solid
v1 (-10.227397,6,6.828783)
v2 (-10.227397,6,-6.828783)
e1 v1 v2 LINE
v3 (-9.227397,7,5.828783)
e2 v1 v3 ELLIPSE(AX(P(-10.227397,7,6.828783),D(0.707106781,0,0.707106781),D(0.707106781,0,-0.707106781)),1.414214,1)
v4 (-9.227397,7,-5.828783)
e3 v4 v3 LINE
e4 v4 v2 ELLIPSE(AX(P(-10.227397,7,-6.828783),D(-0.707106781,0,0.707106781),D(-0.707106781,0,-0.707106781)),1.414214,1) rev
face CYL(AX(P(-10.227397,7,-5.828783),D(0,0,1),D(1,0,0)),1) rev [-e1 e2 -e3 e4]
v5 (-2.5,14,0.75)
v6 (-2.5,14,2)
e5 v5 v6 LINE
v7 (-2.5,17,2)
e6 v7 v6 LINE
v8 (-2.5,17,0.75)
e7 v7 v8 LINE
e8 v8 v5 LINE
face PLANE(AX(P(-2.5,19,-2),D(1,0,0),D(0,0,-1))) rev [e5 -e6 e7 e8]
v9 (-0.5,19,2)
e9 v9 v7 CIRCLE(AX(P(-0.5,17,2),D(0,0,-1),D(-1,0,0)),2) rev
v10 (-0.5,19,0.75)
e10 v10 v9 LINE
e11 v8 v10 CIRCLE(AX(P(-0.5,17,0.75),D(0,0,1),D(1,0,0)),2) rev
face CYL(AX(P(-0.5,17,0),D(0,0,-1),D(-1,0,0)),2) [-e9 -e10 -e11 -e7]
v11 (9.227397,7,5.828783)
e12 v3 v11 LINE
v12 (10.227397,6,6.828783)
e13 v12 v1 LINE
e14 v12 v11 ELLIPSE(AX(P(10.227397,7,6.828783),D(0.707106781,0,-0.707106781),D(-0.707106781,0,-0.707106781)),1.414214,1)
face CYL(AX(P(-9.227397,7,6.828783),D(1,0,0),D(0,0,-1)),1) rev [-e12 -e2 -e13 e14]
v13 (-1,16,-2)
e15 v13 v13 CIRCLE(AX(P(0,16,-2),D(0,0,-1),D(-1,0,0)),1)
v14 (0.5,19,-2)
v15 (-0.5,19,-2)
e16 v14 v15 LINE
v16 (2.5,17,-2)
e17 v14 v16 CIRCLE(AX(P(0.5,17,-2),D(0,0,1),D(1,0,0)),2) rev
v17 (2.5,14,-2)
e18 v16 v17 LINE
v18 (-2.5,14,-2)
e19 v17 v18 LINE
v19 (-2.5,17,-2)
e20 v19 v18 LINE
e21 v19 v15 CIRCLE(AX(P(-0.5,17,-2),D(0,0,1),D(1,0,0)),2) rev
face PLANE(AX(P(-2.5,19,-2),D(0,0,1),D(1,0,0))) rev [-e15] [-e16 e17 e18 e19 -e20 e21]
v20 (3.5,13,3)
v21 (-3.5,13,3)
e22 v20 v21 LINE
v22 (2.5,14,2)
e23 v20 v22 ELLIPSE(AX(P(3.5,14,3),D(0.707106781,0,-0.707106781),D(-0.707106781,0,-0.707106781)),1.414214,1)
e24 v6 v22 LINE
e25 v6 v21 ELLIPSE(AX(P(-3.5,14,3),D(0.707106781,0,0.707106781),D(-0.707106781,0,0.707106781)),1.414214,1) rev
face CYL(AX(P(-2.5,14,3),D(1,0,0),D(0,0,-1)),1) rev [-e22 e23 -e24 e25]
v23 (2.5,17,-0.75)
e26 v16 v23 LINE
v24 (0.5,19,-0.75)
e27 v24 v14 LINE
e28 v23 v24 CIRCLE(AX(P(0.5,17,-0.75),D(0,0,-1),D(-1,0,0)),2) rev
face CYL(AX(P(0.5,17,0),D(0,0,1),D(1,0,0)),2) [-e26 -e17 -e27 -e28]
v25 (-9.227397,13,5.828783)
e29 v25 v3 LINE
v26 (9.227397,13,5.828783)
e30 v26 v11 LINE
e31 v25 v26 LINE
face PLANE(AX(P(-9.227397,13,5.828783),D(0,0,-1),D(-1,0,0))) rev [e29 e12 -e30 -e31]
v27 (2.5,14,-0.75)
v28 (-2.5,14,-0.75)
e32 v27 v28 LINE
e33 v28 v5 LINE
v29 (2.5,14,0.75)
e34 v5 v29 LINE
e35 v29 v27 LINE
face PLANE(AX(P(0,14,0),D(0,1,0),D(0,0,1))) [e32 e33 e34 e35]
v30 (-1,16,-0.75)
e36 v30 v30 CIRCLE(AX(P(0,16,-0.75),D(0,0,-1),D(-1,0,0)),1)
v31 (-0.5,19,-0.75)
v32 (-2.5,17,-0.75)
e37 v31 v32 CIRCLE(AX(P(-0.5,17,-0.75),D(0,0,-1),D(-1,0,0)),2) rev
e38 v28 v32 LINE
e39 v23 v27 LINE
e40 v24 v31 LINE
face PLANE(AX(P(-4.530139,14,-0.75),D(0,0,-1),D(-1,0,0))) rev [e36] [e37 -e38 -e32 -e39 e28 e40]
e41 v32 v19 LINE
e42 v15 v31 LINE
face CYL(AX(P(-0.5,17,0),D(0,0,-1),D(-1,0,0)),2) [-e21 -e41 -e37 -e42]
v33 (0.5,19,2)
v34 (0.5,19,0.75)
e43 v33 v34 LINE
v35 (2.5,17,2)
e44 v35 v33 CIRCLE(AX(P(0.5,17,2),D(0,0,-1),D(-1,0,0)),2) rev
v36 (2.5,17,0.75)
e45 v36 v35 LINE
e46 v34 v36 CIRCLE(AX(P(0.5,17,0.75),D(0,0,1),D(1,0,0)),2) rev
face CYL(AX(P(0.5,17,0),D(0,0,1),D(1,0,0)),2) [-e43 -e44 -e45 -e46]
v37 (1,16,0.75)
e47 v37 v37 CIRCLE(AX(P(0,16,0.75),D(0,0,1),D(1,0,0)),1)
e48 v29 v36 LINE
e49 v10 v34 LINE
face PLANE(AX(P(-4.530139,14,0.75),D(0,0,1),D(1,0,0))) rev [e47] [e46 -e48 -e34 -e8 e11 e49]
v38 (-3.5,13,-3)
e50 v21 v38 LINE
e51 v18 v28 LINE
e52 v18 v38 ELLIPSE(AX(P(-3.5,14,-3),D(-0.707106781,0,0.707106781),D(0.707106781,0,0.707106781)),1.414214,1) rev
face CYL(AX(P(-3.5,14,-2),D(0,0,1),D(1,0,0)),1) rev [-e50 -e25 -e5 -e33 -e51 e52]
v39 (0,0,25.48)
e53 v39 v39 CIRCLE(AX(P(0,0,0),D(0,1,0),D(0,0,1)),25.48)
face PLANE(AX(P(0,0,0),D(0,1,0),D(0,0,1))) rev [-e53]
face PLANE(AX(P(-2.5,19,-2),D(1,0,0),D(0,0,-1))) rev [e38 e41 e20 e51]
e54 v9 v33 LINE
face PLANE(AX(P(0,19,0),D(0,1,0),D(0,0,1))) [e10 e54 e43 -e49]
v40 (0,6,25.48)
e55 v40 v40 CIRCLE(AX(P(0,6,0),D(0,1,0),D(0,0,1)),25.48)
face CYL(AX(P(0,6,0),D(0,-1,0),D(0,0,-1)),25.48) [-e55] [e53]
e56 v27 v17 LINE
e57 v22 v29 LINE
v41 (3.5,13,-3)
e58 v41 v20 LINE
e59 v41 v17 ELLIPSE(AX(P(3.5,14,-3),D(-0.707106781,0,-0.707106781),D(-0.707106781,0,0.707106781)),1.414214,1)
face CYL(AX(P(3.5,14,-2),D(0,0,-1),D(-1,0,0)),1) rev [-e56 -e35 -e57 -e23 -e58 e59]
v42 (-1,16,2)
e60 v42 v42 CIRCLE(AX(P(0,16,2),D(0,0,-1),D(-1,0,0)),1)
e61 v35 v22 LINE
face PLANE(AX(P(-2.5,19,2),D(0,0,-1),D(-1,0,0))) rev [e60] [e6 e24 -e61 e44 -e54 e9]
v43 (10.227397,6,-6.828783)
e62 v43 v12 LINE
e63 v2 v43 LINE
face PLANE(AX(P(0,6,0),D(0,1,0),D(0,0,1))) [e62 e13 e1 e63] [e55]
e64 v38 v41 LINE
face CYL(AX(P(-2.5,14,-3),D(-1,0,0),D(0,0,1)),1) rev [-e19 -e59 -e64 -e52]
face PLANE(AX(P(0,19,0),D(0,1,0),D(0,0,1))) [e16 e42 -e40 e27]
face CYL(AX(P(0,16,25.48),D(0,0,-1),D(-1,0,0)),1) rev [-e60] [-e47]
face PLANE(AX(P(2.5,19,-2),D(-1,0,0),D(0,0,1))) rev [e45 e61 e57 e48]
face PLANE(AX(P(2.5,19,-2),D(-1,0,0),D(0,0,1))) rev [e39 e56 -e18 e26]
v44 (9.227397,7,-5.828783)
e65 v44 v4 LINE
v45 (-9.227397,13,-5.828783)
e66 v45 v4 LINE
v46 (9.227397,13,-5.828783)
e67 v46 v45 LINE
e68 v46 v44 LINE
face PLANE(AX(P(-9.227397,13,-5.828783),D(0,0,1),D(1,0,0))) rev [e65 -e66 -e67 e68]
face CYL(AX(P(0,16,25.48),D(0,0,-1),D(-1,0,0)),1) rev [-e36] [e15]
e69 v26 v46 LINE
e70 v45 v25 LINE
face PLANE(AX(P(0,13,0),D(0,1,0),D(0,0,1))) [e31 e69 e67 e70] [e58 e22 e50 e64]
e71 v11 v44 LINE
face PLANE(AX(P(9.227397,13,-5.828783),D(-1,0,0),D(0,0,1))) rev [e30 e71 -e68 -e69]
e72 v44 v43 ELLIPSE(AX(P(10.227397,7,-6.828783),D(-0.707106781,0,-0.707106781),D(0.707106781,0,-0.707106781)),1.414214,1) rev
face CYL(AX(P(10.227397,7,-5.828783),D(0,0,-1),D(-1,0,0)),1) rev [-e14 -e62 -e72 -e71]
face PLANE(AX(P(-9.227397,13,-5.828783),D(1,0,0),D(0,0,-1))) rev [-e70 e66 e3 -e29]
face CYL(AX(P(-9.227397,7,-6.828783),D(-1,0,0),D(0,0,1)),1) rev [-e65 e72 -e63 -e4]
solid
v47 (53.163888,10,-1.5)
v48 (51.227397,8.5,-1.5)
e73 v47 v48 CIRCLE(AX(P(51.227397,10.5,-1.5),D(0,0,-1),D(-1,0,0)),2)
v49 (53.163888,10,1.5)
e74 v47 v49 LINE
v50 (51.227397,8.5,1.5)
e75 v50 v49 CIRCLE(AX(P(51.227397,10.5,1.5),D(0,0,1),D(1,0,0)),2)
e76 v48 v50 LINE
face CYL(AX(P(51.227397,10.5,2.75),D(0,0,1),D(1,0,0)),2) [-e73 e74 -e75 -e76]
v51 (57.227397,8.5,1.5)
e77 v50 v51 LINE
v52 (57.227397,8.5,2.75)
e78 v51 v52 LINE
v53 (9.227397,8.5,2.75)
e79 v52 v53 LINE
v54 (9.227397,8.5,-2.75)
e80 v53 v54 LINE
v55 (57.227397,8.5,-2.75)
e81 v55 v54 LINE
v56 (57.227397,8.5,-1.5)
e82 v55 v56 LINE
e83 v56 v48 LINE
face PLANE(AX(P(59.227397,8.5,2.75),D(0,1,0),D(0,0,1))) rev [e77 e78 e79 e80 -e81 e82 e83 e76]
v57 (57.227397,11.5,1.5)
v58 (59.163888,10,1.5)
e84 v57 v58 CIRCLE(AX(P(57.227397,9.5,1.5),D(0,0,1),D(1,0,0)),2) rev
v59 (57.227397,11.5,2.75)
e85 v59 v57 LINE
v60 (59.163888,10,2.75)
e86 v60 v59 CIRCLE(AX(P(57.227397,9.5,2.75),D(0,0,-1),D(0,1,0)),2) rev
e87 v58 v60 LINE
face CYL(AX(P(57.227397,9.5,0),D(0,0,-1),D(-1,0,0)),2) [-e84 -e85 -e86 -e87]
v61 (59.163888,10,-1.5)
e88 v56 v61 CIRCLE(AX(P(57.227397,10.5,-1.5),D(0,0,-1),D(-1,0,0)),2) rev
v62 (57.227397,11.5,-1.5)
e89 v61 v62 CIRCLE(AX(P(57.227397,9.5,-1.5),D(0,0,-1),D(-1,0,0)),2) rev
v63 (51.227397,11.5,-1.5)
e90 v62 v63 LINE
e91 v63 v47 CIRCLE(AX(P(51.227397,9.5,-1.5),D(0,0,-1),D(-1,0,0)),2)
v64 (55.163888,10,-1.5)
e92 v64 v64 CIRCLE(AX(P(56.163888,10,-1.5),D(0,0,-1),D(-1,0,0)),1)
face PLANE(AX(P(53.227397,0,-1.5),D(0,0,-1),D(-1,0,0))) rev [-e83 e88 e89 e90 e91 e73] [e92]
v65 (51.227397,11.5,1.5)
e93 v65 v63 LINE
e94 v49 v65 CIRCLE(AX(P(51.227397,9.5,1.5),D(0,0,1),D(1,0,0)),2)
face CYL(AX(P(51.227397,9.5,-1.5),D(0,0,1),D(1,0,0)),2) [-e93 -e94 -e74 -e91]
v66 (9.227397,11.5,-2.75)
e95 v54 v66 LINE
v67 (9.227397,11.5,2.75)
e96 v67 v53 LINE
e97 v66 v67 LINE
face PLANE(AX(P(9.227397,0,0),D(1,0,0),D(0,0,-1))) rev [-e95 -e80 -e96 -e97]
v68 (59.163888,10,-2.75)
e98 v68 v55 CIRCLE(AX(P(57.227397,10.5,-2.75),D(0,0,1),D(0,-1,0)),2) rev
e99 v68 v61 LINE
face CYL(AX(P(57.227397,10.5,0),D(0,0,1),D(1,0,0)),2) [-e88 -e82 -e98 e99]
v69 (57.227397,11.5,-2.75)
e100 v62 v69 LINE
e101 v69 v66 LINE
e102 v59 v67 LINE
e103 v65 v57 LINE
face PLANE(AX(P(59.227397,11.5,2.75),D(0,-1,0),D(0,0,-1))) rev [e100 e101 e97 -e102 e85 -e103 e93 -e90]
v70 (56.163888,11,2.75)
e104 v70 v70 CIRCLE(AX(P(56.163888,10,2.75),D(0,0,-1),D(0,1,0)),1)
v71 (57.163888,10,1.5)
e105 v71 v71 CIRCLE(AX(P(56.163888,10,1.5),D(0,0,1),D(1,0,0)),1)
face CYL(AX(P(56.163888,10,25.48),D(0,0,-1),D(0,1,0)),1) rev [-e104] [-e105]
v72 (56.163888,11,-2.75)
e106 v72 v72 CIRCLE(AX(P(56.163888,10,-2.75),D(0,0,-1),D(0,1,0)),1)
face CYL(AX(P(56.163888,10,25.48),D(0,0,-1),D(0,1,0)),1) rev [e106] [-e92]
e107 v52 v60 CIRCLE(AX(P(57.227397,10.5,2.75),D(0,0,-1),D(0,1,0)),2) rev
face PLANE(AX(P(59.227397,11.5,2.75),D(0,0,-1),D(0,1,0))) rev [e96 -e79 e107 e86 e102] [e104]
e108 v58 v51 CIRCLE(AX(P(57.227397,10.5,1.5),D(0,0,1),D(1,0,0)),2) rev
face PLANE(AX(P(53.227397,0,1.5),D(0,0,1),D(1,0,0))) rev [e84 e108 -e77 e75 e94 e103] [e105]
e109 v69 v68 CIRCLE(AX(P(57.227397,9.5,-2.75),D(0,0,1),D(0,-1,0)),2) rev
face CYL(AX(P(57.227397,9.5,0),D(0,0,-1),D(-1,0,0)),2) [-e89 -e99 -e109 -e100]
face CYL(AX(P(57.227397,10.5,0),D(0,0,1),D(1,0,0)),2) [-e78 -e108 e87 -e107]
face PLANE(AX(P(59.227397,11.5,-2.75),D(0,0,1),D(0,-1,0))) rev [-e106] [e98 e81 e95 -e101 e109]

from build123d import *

# Parameters (mm, degrees)
SKETCH1_R           = 25.48
BOSS_EXTRUDE1_DEPTH = 6
SKETCH2_W           = 18.454793018
SKETCH2_H           = 11.657566824
BOSS_EXTRUDE2_DEPTH = 7
FILLET1_R           = 1
SKETCH3_W           = 5.5
SKETCH3_H           = 3
BOSS_EXTRUDE3_DEPTH = 50
SKETCH7_W           = 6
SKETCH7_H           = 3
CUT_EXTRUDE3_DEPTH  = 66.493243142
FILLET3_R           = 2
SKETCH9_W           = 5
SKETCH9_H           = 4
BOSS_EXTRUDE4_DEPTH = 6
FILLET4_R           = 1
SKETCH10_W          = 9.060277754
SKETCH10_H          = 1.5
CUT_EXTRUDE5_DEPTH  = 5
SKETCH11_R          = 1
CUT_EXTRUDE6_DEPTH  = 68.944948781
FILLET5_R           = 2
FILLET6_R           = 2
SKETCH13_R          = 1
CUT_EXTRUDE7_DEPTH  = 69.251729391


with BuildPart() as part:
    # Sketch1 → Boss-Extrude1 (new body)
    with BuildSketch(Plane(origin=(0, 0, 0), x_dir=(1, 0, 0), z_dir=(0, 1, 0))):
        with Locations(Location((0, 0, 0), (0, 0, 270))):
            Circle(SKETCH1_R)
    extrude(amount=BOSS_EXTRUDE1_DEPTH)

    # Sketch2 → Boss-Extrude2 (add)
    with BuildSketch(Plane(origin=(0, 6, 0), x_dir=(1, 0, 0), z_dir=(0, 1, 0))):
        Rectangle(SKETCH2_W, SKETCH2_H)
    extrude(amount=BOSS_EXTRUDE2_DEPTH)

    # Fillet1
    fillet1_edges = [part.edges().sort_by_distance(p)[0] for p in [
        (9.227396509, 6, 0),
        (0, 6, -5.828783412),
        (-9.227396509, 6, 0),
        (0, 6, 5.828783412),
    ]]
    fillet(fillet1_edges, radius=FILLET1_R)

    # Sketch9 → Boss-Extrude4 (add)
    with BuildSketch(Plane(origin=(0, 13, 0), x_dir=(1, 0, 0), z_dir=(0, 1, 0))):
        Rectangle(SKETCH9_W, SKETCH9_H)
    extrude(amount=BOSS_EXTRUDE4_DEPTH)

    # Fillet4
    fillet4_edges = [part.edges().sort_by_distance(p)[0] for p in [
        (2.5, 13, 0),
        (0, 13, -2),
        (-2.5, 13, 0),
        (0, 13, 2),
    ]]
    fillet(fillet4_edges, radius=FILLET4_R)

    # Sketch10 → Cut-Extrude5 (cut)
    with BuildSketch(Plane(origin=(0, 19, 0), x_dir=(1, 0, 0), z_dir=(0, 1, 0))):
        Rectangle(SKETCH10_W, SKETCH10_H)
    extrude(amount=-CUT_EXTRUDE5_DEPTH, mode=Mode.SUBTRACT)

    # Sketch11 → Cut-Extrude6 (cut, through all)
    with BuildSketch(Plane(origin=(0, 0, -2), x_dir=(-1, 0, 0), z_dir=(0, 0, -1))):
        with Locations((0, 16)):
            Circle(SKETCH11_R)
    extrude(amount=-CUT_EXTRUDE6_DEPTH, mode=Mode.SUBTRACT)

    # Fillet5
    fillet5_edges = [part.edges().sort_by_distance(p)[0] for p in [
        (2.5, 19, 1.375),
        (-2.5, 19, -1.375),
        (2.5, 19, -1.375),
        (-2.5, 19, 1.375),
    ]]
    fillet(fillet5_edges, radius=FILLET5_R)


with BuildPart() as body_2:
    # Sketch3 → Boss-Extrude3 (new body)
    with BuildSketch(Plane(origin=(9.227396509, 0, 0), x_dir=(0, 0, -1), z_dir=(1, 0, 0))):
        with Locations((0, 10)):
            Rectangle(SKETCH3_W, SKETCH3_H)
    extrude(amount=BOSS_EXTRUDE3_DEPTH)

    # Sketch7 → Cut-Extrude3 (cut, through all)
    with BuildSketch(Plane(origin=(0, 11.5, 0), x_dir=(1, 0, 0), z_dir=(0, 1, 0))):
        with Locations((56.227396509, 0)):
            Rectangle(SKETCH7_W, SKETCH7_H)
    extrude(amount=-CUT_EXTRUDE3_DEPTH, mode=Mode.SUBTRACT)

    # Fillet3
    # the kernel refuses this fillet: 2 mm, written as the material it takes off along each edge
    with BuildSketch(Plane(origin=(59.227396509, 8.5, -3.5), x_dir=(0, 1, 0), z_dir=(0, 0, 1)), Plane(origin=(59.227396509, 8.5, -7.75), x_dir=(0, 1, 0), z_dir=(0, 0, 1))) as fillet3_piece_1:
        with BuildLine():
            CenterArc((FILLET3_R, FILLET3_R), FILLET3_R, 180, 90)
            Line((0, FILLET3_R), (0, 0))
            Line((0, 0), (FILLET3_R, 0))
        make_face()
    extrude(amount=11.25, mode=Mode.SUBTRACT)
    with BuildSketch(Plane(origin=(59.227396509, 11.5, 7.75), x_dir=(-1, 0, 0), z_dir=(0, 0, -1)), Plane(origin=(59.227396509, 11.5, 3.5), x_dir=(-1, 0, 0), z_dir=(0, 0, -1))) as fillet3_piece_2:
        with BuildLine():
            CenterArc((FILLET3_R, -FILLET3_R), FILLET3_R, 90, 90)
            Line((0, -FILLET3_R), (0, 0))
            Line((0, 0), (FILLET3_R, 0))
        make_face()
    extrude(amount=11.25, mode=Mode.SUBTRACT)

    # Fillet6
    # the kernel refuses this fillet: 2 mm, written as the material it takes off along each edge
    with BuildSketch(Plane(origin=(53.227396509, 8.5, -1.5), x_dir=(0, 1, 0), z_dir=(0, 0, 1))) as fillet6_piece_1:
        with BuildLine():
            CenterArc((FILLET6_R, FILLET6_R), FILLET6_R, 180, 90)
            Line((0, FILLET6_R), (0, 0))
            Line((0, 0), (FILLET6_R, 0))
        make_face()
    extrude(amount=3, mode=Mode.SUBTRACT)
    with BuildSketch(Plane(origin=(53.227396509, 11.5, 1.5), x_dir=(-1, 0, 0), z_dir=(0, 0, -1))) as fillet6_piece_2:
        with BuildLine():
            CenterArc((FILLET6_R, -FILLET6_R), FILLET6_R, 90, 90)
            Line((0, -FILLET6_R), (0, 0))
            Line((0, 0), (FILLET6_R, 0))
        make_face()
    extrude(amount=3, mode=Mode.SUBTRACT)

    # Sketch13 → Cut-Extrude7 (cut, through all)
    with BuildSketch(Plane(origin=(0, 0, -2.75), x_dir=(-1, 0, 0), z_dir=(0, 0, -1))):
        with Locations(Location((-56.163888182, 10, 0), (0, 0, 90))):
            Circle(SKETCH13_R)
    extrude(amount=-CUT_EXTRUDE7_DEPTH, mode=Mode.SUBTRACT)


solid = Compound([part.part, body_2.part])
